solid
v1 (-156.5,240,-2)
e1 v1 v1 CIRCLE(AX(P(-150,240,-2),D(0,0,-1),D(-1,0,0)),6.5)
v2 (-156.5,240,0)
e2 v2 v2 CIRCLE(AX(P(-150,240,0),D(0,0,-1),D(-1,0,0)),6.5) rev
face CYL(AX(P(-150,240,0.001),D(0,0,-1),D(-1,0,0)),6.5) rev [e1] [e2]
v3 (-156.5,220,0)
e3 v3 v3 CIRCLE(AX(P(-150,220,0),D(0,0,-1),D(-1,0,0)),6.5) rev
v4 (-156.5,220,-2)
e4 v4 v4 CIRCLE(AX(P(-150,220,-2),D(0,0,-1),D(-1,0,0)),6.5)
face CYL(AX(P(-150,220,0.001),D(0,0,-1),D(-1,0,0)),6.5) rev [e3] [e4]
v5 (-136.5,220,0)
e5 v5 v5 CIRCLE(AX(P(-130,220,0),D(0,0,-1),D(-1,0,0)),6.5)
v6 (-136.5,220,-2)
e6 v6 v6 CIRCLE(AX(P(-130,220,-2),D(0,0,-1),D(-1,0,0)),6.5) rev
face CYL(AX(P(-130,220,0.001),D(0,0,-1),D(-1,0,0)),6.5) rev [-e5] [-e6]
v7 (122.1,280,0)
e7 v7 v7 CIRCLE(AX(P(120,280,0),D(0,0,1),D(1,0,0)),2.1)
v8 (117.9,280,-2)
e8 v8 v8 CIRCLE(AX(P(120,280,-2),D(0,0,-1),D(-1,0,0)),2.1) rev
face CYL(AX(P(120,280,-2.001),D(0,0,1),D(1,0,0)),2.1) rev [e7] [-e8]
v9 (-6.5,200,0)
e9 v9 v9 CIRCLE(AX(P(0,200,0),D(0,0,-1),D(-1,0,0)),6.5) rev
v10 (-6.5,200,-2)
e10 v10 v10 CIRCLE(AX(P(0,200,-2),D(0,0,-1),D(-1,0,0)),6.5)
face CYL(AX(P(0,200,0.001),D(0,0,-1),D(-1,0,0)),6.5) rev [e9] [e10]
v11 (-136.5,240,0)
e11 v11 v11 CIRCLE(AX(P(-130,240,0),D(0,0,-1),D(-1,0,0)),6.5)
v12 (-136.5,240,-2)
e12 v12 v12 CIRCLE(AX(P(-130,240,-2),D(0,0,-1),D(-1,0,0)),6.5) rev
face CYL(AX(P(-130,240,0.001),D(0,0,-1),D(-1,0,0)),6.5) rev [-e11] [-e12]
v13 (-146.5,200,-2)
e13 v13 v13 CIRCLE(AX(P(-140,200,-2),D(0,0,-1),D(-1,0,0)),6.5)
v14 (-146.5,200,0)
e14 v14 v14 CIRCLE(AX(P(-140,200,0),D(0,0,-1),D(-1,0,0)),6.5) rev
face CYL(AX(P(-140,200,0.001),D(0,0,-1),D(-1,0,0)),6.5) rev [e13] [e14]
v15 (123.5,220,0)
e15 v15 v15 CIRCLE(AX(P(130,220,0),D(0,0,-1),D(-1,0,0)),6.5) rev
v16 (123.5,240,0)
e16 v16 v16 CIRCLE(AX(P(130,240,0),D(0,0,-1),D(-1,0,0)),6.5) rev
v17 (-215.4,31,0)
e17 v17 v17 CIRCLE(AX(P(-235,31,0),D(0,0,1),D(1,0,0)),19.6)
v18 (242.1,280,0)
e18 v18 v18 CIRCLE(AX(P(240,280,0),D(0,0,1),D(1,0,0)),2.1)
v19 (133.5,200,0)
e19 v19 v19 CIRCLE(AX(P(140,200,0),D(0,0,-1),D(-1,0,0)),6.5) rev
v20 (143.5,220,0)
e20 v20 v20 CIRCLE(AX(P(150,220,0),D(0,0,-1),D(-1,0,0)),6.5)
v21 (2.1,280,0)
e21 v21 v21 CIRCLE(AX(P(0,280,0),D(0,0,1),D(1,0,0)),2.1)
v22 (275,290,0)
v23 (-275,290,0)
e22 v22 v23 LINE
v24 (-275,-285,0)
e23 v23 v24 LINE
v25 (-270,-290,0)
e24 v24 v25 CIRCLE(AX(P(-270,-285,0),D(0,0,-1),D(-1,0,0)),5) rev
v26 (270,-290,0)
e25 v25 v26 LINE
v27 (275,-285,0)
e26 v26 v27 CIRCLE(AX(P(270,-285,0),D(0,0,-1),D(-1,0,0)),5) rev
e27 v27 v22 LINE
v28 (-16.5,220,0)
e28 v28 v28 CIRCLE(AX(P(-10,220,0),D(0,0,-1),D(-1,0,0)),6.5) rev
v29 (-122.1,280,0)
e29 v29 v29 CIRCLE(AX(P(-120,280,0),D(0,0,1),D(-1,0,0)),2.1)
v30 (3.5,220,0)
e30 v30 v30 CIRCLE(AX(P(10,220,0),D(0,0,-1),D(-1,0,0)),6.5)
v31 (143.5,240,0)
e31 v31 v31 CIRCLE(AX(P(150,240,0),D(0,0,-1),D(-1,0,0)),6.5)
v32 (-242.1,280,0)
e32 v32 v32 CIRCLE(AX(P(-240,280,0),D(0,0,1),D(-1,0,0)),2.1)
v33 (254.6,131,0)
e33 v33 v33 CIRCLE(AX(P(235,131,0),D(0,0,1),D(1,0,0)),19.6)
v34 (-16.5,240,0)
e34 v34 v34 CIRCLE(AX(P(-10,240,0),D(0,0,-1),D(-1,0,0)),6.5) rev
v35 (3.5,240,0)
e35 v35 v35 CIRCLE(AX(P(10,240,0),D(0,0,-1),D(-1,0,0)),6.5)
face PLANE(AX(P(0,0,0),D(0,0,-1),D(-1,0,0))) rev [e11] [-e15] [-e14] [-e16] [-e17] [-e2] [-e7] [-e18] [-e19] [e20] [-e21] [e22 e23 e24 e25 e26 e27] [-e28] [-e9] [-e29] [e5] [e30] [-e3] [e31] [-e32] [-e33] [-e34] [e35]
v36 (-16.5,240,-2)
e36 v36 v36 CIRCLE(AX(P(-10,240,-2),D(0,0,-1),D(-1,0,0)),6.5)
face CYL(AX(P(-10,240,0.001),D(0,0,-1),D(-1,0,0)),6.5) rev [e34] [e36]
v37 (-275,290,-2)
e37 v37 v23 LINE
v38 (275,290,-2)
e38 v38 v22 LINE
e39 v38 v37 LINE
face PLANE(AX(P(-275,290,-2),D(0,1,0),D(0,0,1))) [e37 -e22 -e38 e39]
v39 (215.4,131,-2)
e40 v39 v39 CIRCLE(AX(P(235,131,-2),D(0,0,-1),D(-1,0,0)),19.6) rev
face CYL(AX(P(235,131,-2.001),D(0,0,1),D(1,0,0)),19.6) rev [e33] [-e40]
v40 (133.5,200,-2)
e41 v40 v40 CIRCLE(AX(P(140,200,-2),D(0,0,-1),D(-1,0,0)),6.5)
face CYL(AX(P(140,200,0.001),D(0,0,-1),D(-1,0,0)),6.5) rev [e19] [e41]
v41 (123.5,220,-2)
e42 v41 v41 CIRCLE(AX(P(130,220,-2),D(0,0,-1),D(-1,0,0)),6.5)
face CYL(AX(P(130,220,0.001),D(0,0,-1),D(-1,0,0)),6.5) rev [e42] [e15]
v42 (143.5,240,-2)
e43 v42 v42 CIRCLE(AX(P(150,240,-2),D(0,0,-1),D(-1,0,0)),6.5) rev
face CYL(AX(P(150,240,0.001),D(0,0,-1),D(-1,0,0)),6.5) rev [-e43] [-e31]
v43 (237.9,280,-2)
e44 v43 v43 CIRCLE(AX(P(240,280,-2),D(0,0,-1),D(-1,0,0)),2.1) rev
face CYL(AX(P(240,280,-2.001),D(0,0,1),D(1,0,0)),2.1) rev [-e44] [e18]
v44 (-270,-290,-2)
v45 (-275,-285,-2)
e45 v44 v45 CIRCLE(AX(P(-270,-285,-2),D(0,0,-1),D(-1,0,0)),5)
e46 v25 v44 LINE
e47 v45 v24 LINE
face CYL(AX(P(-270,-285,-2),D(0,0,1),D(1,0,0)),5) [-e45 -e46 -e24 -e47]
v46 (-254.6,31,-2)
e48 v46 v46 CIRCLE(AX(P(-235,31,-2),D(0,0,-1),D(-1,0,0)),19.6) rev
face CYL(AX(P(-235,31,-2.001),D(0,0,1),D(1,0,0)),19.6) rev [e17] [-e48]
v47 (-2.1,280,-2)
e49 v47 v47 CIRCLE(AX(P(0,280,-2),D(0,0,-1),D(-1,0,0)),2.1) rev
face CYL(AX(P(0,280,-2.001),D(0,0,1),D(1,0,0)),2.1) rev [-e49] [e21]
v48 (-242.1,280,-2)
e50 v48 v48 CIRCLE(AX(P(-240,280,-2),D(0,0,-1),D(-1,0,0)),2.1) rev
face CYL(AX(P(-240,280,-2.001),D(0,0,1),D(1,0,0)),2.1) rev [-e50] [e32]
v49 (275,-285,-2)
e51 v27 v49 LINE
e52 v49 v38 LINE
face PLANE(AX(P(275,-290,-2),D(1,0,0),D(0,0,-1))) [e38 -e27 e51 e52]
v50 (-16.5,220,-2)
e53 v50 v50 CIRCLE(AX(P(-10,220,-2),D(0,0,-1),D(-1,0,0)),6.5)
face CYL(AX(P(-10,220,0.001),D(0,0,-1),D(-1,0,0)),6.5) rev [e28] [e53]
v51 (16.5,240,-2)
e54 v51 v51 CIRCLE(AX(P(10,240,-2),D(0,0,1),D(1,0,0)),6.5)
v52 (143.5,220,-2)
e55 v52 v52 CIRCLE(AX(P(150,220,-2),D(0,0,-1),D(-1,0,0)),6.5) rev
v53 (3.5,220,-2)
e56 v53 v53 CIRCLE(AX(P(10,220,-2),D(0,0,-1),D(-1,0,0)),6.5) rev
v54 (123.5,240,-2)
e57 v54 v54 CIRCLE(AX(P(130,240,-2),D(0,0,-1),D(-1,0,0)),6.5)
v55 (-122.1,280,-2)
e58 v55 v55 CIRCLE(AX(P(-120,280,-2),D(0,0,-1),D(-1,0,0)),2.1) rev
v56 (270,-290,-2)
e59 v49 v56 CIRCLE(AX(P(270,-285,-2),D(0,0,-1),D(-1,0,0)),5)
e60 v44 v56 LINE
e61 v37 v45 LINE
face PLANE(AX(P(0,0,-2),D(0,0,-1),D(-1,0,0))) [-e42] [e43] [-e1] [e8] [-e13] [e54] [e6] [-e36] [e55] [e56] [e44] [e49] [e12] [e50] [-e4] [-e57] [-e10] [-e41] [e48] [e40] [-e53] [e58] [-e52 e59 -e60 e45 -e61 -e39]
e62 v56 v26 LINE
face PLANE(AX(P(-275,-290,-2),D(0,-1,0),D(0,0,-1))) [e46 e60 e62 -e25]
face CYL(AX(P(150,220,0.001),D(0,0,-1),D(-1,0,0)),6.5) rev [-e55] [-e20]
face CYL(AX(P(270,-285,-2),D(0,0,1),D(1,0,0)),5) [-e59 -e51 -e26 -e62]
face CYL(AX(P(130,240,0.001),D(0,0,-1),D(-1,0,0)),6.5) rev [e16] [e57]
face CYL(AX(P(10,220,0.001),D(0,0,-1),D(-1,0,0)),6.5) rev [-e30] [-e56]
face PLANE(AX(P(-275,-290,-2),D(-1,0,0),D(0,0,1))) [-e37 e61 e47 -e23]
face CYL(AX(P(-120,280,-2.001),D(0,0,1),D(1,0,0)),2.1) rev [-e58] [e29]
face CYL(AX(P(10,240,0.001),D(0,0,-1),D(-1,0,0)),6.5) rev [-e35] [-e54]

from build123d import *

# Parameters (mm, degrees)
SZKIC1_W                   = 550
SZKIC1_H                   = 580
ODGI_CIE_BAZOWE1_DEPTH     = 2
ZAOKR_GLENIE1_R            = 5
WYTNIJ_WYCI_GNI_CIE1_REACH = 401.661
SZKIC2_R                   = 19.6
WYTNIJ_WYCI_GNI_CIE3_REACH = 401.661
SZKIC4_R                   = 2.1
WYTNIJ_WYCI_GNI_CIE4_REACH = 401.661
SZKIC5_R                   = 6.5
WYTNIJ_WYCI_GNI_CIE5_REACH = 401.661
SZKIC6_R                   = 6.5


# Sheet-metal steps are written as plain solids
with BuildPart() as part:
    # Szkic1 → Odgięcie bazowe1 (new body)
    with BuildSketch(Plane.XY):
        Rectangle(SZKIC1_W, SZKIC1_H)
    extrude(amount=-ODGI_CIE_BAZOWE1_DEPTH)

    # Zaokrąglenie1
    zaokr_glenie1_edges = [part.edges().sort_by_distance(p)[0] for p in [
        (275, -290, -1),
        (-275, -290, -1),
    ]]
    fillet(zaokr_glenie1_edges, radius=ZAOKR_GLENIE1_R)

    # Szkic2 → Wytnij-wyciągnięcie1 (cut, up to next)
    with BuildSketch(Plane.XY, mode=Mode.PRIVATE) as wytnij_wyci_gni_cie1_sk1:
        with Locations((-235, 31)):
            Circle(SZKIC2_R)
    wytnij_wyci_gni_cie1_tool1 = extrude(wytnij_wyci_gni_cie1_sk1.sketch, amount=-WYTNIJ_WYCI_GNI_CIE1_REACH, mode=Mode.PRIVATE) & part.part
    # Szkic2 → Wytnij-wyciągnięcie1 (cut, up to next)
    with BuildSketch(Plane.XY, mode=Mode.PRIVATE) as wytnij_wyci_gni_cie1_sk2:
        with Locations((235, 131)):
            Circle(SZKIC2_R)
    wytnij_wyci_gni_cie1_tool2 = extrude(wytnij_wyci_gni_cie1_sk2.sketch, amount=-WYTNIJ_WYCI_GNI_CIE1_REACH, mode=Mode.PRIVATE) & part.part
    add(wytnij_wyci_gni_cie1_tool1.solids().sort_by_distance((-235, 31, 0))[0], mode=Mode.SUBTRACT)
    add(wytnij_wyci_gni_cie1_tool2.solids().sort_by_distance((235, 131, 0))[0], mode=Mode.SUBTRACT)

    # Szkic4 → Wytnij-wyciągnięcie3 (cut, up to next)
    with BuildSketch(Plane.XY, mode=Mode.PRIVATE) as wytnij_wyci_gni_cie3_sk1:
        with Locations((0, 280)):
            Circle(SZKIC4_R)
    wytnij_wyci_gni_cie3_tool1 = extrude(wytnij_wyci_gni_cie3_sk1.sketch, amount=-WYTNIJ_WYCI_GNI_CIE3_REACH, mode=Mode.PRIVATE) & part.part
    # Szkic4 → Wytnij-wyciągnięcie3 (cut, up to next)
    with BuildSketch(Plane.XY, mode=Mode.PRIVATE) as wytnij_wyci_gni_cie3_sk2:
        with Locations((120, 280)):
            Circle(SZKIC4_R)
    wytnij_wyci_gni_cie3_tool2 = extrude(wytnij_wyci_gni_cie3_sk2.sketch, amount=-WYTNIJ_WYCI_GNI_CIE3_REACH, mode=Mode.PRIVATE) & part.part
    # Szkic4 → Wytnij-wyciągnięcie3 (cut, up to next)
    with BuildSketch(Plane.XY, mode=Mode.PRIVATE) as wytnij_wyci_gni_cie3_sk3:
        with Locations((240, 280)):
            Circle(SZKIC4_R)
    wytnij_wyci_gni_cie3_tool3 = extrude(wytnij_wyci_gni_cie3_sk3.sketch, amount=-WYTNIJ_WYCI_GNI_CIE3_REACH, mode=Mode.PRIVATE) & part.part
    # Szkic4 → Wytnij-wyciągnięcie3 (cut, up to next)
    with BuildSketch(Plane.XY, mode=Mode.PRIVATE) as wytnij_wyci_gni_cie3_sk4:
        with Locations(Location((-240, 280, 0), (0, 0, 180))):
            Circle(SZKIC4_R)
    wytnij_wyci_gni_cie3_tool4 = extrude(wytnij_wyci_gni_cie3_sk4.sketch, amount=-WYTNIJ_WYCI_GNI_CIE3_REACH, mode=Mode.PRIVATE) & part.part
    # Szkic4 → Wytnij-wyciągnięcie3 (cut, up to next)
    with BuildSketch(Plane.XY, mode=Mode.PRIVATE) as wytnij_wyci_gni_cie3_sk5:
        with Locations(Location((-120, 280, 0), (0, 0, 180))):
            Circle(SZKIC4_R)
    wytnij_wyci_gni_cie3_tool5 = extrude(wytnij_wyci_gni_cie3_sk5.sketch, amount=-WYTNIJ_WYCI_GNI_CIE3_REACH, mode=Mode.PRIVATE) & part.part
    add(wytnij_wyci_gni_cie3_tool1.solids().sort_by_distance((0, 280, 0))[0], mode=Mode.SUBTRACT)
    add(wytnij_wyci_gni_cie3_tool2.solids().sort_by_distance((120, 280, 0))[0], mode=Mode.SUBTRACT)
    add(wytnij_wyci_gni_cie3_tool3.solids().sort_by_distance((240, 280, 0))[0], mode=Mode.SUBTRACT)
    add(wytnij_wyci_gni_cie3_tool4.solids().sort_by_distance((-240, 280, 0))[0], mode=Mode.SUBTRACT)
    add(wytnij_wyci_gni_cie3_tool5.solids().sort_by_distance((-120, 280, 0))[0], mode=Mode.SUBTRACT)

    # Szkic5 → Wytnij-wyciągnięcie4 (cut, up to next)
    with BuildSketch(Plane(origin=(0, 0, -2), x_dir=(-1, 0, 0), z_dir=(0, 0, -1)), mode=Mode.PRIVATE) as wytnij_wyci_gni_cie4_sk1:
        with Locations((-150, 240)):
            Circle(SZKIC5_R)
    wytnij_wyci_gni_cie4_tool1 = extrude(wytnij_wyci_gni_cie4_sk1.sketch, amount=-WYTNIJ_WYCI_GNI_CIE4_REACH, mode=Mode.PRIVATE) & part.part
    # Szkic5 → Wytnij-wyciągnięcie4 (cut, up to next)
    with BuildSketch(Plane(origin=(0, 0, -2), x_dir=(-1, 0, 0), z_dir=(0, 0, -1)), mode=Mode.PRIVATE) as wytnij_wyci_gni_cie4_sk2:
        with Locations((-130, 240)):
            Circle(SZKIC5_R)
    wytnij_wyci_gni_cie4_tool2 = extrude(wytnij_wyci_gni_cie4_sk2.sketch, amount=-WYTNIJ_WYCI_GNI_CIE4_REACH, mode=Mode.PRIVATE) & part.part
    # Szkic5 → Wytnij-wyciągnięcie4 (cut, up to next)
    with BuildSketch(Plane(origin=(0, 0, -2), x_dir=(-1, 0, 0), z_dir=(0, 0, -1)), mode=Mode.PRIVATE) as wytnij_wyci_gni_cie4_sk3:
        with Locations((-150, 220)):
            Circle(SZKIC5_R)
    wytnij_wyci_gni_cie4_tool3 = extrude(wytnij_wyci_gni_cie4_sk3.sketch, amount=-WYTNIJ_WYCI_GNI_CIE4_REACH, mode=Mode.PRIVATE) & part.part
    # Szkic5 → Wytnij-wyciągnięcie4 (cut, up to next)
    with BuildSketch(Plane(origin=(0, 0, -2), x_dir=(-1, 0, 0), z_dir=(0, 0, -1)), mode=Mode.PRIVATE) as wytnij_wyci_gni_cie4_sk4:
        with Locations((-130, 220)):
            Circle(SZKIC5_R)
    wytnij_wyci_gni_cie4_tool4 = extrude(wytnij_wyci_gni_cie4_sk4.sketch, amount=-WYTNIJ_WYCI_GNI_CIE4_REACH, mode=Mode.PRIVATE) & part.part
    # Szkic5 → Wytnij-wyciągnięcie4 (cut, up to next)
    with BuildSketch(Plane(origin=(0, 0, -2), x_dir=(-1, 0, 0), z_dir=(0, 0, -1)), mode=Mode.PRIVATE) as wytnij_wyci_gni_cie4_sk5:
        with Locations((10, 240)):
            Circle(SZKIC5_R)
    wytnij_wyci_gni_cie4_tool5 = extrude(wytnij_wyci_gni_cie4_sk5.sketch, amount=-WYTNIJ_WYCI_GNI_CIE4_REACH, mode=Mode.PRIVATE) & part.part
    # Szkic5 → Wytnij-wyciągnięcie4 (cut, up to next)
    with BuildSketch(Plane(origin=(0, 0, -2), x_dir=(-1, 0, 0), z_dir=(0, 0, -1)), mode=Mode.PRIVATE) as wytnij_wyci_gni_cie4_sk6:
        with Locations((10, 220)):
            Circle(SZKIC5_R)
    wytnij_wyci_gni_cie4_tool6 = extrude(wytnij_wyci_gni_cie4_sk6.sketch, amount=-WYTNIJ_WYCI_GNI_CIE4_REACH, mode=Mode.PRIVATE) & part.part
    # Szkic5 → Wytnij-wyciągnięcie4 (cut, up to next)
    with BuildSketch(Plane(origin=(0, 0, -2), x_dir=(-1, 0, 0), z_dir=(0, 0, -1)), mode=Mode.PRIVATE) as wytnij_wyci_gni_cie4_sk7:
        with Locations((-10, 220)):
            Circle(SZKIC5_R)
    wytnij_wyci_gni_cie4_tool7 = extrude(wytnij_wyci_gni_cie4_sk7.sketch, amount=-WYTNIJ_WYCI_GNI_CIE4_REACH, mode=Mode.PRIVATE) & part.part
    # Szkic5 → Wytnij-wyciągnięcie4 (cut, up to next)
    with BuildSketch(Plane(origin=(0, 0, -2), x_dir=(-1, 0, 0), z_dir=(0, 0, -1)), mode=Mode.PRIVATE) as wytnij_wyci_gni_cie4_sk8:
        with Locations((130, 220)):
            Circle(SZKIC5_R)
    wytnij_wyci_gni_cie4_tool8 = extrude(wytnij_wyci_gni_cie4_sk8.sketch, amount=-WYTNIJ_WYCI_GNI_CIE4_REACH, mode=Mode.PRIVATE) & part.part
    # Szkic5 → Wytnij-wyciągnięcie4 (cut, up to next)
    with BuildSketch(Plane(origin=(0, 0, -2), x_dir=(-1, 0, 0), z_dir=(0, 0, -1)), mode=Mode.PRIVATE) as wytnij_wyci_gni_cie4_sk9:
        with Locations((150, 220)):
            Circle(SZKIC5_R)
    wytnij_wyci_gni_cie4_tool9 = extrude(wytnij_wyci_gni_cie4_sk9.sketch, amount=-WYTNIJ_WYCI_GNI_CIE4_REACH, mode=Mode.PRIVATE) & part.part
    # Szkic5 → Wytnij-wyciągnięcie4 (cut, up to next)
    with BuildSketch(Plane(origin=(0, 0, -2), x_dir=(-1, 0, 0), z_dir=(0, 0, -1)), mode=Mode.PRIVATE) as wytnij_wyci_gni_cie4_sk10:
        with Locations((150, 240)):
            Circle(SZKIC5_R)
    wytnij_wyci_gni_cie4_tool10 = extrude(wytnij_wyci_gni_cie4_sk10.sketch, amount=-WYTNIJ_WYCI_GNI_CIE4_REACH, mode=Mode.PRIVATE) & part.part
    # Szkic5 → Wytnij-wyciągnięcie4 (cut, up to next)
    with BuildSketch(Plane(origin=(0, 0, -2), x_dir=(-1, 0, 0), z_dir=(0, 0, -1)), mode=Mode.PRIVATE) as wytnij_wyci_gni_cie4_sk11:
        with Locations((130, 240)):
            Circle(SZKIC5_R)
    wytnij_wyci_gni_cie4_tool11 = extrude(wytnij_wyci_gni_cie4_sk11.sketch, amount=-WYTNIJ_WYCI_GNI_CIE4_REACH, mode=Mode.PRIVATE) & part.part
    # Szkic5 → Wytnij-wyciągnięcie4 (cut, up to next)
    with BuildSketch(Plane(origin=(0, 0, -2), x_dir=(-1, 0, 0), z_dir=(0, 0, -1)), mode=Mode.PRIVATE) as wytnij_wyci_gni_cie4_sk12:
        with Locations((-10, 240)):
            Circle(SZKIC5_R)
    wytnij_wyci_gni_cie4_tool12 = extrude(wytnij_wyci_gni_cie4_sk12.sketch, amount=-WYTNIJ_WYCI_GNI_CIE4_REACH, mode=Mode.PRIVATE) & part.part
    add(wytnij_wyci_gni_cie4_tool1.solids().sort_by_distance((150, 240, -2))[0], mode=Mode.SUBTRACT)
    add(wytnij_wyci_gni_cie4_tool2.solids().sort_by_distance((130, 240, -2))[0], mode=Mode.SUBTRACT)
    add(wytnij_wyci_gni_cie4_tool3.solids().sort_by_distance((150, 220, -2))[0], mode=Mode.SUBTRACT)
    add(wytnij_wyci_gni_cie4_tool4.solids().sort_by_distance((130, 220, -2))[0], mode=Mode.SUBTRACT)
    add(wytnij_wyci_gni_cie4_tool5.solids().sort_by_distance((-10, 240, -2))[0], mode=Mode.SUBTRACT)
    add(wytnij_wyci_gni_cie4_tool6.solids().sort_by_distance((-10, 220, -2))[0], mode=Mode.SUBTRACT)
    add(wytnij_wyci_gni_cie4_tool7.solids().sort_by_distance((10, 220, -2))[0], mode=Mode.SUBTRACT)
    add(wytnij_wyci_gni_cie4_tool8.solids().sort_by_distance((-130, 220, -2))[0], mode=Mode.SUBTRACT)
    add(wytnij_wyci_gni_cie4_tool9.solids().sort_by_distance((-150, 220, -2))[0], mode=Mode.SUBTRACT)
    add(wytnij_wyci_gni_cie4_tool10.solids().sort_by_distance((-150, 240, -2))[0], mode=Mode.SUBTRACT)
    add(wytnij_wyci_gni_cie4_tool11.solids().sort_by_distance((-130, 240, -2))[0], mode=Mode.SUBTRACT)
    add(wytnij_wyci_gni_cie4_tool12.solids().sort_by_distance((10, 240, -2))[0], mode=Mode.SUBTRACT)

    # Szkic6 → Wytnij-wyciągnięcie5 (cut, up to next)
    with BuildSketch(Plane(origin=(0, 0, -2), x_dir=(-1, 0, 0), z_dir=(0, 0, -1)), mode=Mode.PRIVATE) as wytnij_wyci_gni_cie5_sk1:
        with Locations((0, 200)):
            Circle(SZKIC6_R)
    wytnij_wyci_gni_cie5_tool1 = extrude(wytnij_wyci_gni_cie5_sk1.sketch, amount=-WYTNIJ_WYCI_GNI_CIE5_REACH, mode=Mode.PRIVATE) & part.part
    # Szkic6 → Wytnij-wyciągnięcie5 (cut, up to next)
    with BuildSketch(Plane(origin=(0, 0, -2), x_dir=(-1, 0, 0), z_dir=(0, 0, -1)), mode=Mode.PRIVATE) as wytnij_wyci_gni_cie5_sk2:
        with Locations((140, 200)):
            Circle(SZKIC6_R)
    wytnij_wyci_gni_cie5_tool2 = extrude(wytnij_wyci_gni_cie5_sk2.sketch, amount=-WYTNIJ_WYCI_GNI_CIE5_REACH, mode=Mode.PRIVATE) & part.part
    # Szkic6 → Wytnij-wyciągnięcie5 (cut, up to next)
    with BuildSketch(Plane(origin=(0, 0, -2), x_dir=(-1, 0, 0), z_dir=(0, 0, -1)), mode=Mode.PRIVATE) as wytnij_wyci_gni_cie5_sk3:
        with Locations((-140, 200)):
            Circle(SZKIC6_R)
    wytnij_wyci_gni_cie5_tool3 = extrude(wytnij_wyci_gni_cie5_sk3.sketch, amount=-WYTNIJ_WYCI_GNI_CIE5_REACH, mode=Mode.PRIVATE) & part.part
    add(wytnij_wyci_gni_cie5_tool1.solids().sort_by_distance((0, 200, -2))[0], mode=Mode.SUBTRACT)
    add(wytnij_wyci_gni_cie5_tool2.solids().sort_by_distance((-140, 200, -2))[0], mode=Mode.SUBTRACT)
    add(wytnij_wyci_gni_cie5_tool3.solids().sort_by_distance((140, 200, -2))[0], mode=Mode.SUBTRACT)


solid = part.part
